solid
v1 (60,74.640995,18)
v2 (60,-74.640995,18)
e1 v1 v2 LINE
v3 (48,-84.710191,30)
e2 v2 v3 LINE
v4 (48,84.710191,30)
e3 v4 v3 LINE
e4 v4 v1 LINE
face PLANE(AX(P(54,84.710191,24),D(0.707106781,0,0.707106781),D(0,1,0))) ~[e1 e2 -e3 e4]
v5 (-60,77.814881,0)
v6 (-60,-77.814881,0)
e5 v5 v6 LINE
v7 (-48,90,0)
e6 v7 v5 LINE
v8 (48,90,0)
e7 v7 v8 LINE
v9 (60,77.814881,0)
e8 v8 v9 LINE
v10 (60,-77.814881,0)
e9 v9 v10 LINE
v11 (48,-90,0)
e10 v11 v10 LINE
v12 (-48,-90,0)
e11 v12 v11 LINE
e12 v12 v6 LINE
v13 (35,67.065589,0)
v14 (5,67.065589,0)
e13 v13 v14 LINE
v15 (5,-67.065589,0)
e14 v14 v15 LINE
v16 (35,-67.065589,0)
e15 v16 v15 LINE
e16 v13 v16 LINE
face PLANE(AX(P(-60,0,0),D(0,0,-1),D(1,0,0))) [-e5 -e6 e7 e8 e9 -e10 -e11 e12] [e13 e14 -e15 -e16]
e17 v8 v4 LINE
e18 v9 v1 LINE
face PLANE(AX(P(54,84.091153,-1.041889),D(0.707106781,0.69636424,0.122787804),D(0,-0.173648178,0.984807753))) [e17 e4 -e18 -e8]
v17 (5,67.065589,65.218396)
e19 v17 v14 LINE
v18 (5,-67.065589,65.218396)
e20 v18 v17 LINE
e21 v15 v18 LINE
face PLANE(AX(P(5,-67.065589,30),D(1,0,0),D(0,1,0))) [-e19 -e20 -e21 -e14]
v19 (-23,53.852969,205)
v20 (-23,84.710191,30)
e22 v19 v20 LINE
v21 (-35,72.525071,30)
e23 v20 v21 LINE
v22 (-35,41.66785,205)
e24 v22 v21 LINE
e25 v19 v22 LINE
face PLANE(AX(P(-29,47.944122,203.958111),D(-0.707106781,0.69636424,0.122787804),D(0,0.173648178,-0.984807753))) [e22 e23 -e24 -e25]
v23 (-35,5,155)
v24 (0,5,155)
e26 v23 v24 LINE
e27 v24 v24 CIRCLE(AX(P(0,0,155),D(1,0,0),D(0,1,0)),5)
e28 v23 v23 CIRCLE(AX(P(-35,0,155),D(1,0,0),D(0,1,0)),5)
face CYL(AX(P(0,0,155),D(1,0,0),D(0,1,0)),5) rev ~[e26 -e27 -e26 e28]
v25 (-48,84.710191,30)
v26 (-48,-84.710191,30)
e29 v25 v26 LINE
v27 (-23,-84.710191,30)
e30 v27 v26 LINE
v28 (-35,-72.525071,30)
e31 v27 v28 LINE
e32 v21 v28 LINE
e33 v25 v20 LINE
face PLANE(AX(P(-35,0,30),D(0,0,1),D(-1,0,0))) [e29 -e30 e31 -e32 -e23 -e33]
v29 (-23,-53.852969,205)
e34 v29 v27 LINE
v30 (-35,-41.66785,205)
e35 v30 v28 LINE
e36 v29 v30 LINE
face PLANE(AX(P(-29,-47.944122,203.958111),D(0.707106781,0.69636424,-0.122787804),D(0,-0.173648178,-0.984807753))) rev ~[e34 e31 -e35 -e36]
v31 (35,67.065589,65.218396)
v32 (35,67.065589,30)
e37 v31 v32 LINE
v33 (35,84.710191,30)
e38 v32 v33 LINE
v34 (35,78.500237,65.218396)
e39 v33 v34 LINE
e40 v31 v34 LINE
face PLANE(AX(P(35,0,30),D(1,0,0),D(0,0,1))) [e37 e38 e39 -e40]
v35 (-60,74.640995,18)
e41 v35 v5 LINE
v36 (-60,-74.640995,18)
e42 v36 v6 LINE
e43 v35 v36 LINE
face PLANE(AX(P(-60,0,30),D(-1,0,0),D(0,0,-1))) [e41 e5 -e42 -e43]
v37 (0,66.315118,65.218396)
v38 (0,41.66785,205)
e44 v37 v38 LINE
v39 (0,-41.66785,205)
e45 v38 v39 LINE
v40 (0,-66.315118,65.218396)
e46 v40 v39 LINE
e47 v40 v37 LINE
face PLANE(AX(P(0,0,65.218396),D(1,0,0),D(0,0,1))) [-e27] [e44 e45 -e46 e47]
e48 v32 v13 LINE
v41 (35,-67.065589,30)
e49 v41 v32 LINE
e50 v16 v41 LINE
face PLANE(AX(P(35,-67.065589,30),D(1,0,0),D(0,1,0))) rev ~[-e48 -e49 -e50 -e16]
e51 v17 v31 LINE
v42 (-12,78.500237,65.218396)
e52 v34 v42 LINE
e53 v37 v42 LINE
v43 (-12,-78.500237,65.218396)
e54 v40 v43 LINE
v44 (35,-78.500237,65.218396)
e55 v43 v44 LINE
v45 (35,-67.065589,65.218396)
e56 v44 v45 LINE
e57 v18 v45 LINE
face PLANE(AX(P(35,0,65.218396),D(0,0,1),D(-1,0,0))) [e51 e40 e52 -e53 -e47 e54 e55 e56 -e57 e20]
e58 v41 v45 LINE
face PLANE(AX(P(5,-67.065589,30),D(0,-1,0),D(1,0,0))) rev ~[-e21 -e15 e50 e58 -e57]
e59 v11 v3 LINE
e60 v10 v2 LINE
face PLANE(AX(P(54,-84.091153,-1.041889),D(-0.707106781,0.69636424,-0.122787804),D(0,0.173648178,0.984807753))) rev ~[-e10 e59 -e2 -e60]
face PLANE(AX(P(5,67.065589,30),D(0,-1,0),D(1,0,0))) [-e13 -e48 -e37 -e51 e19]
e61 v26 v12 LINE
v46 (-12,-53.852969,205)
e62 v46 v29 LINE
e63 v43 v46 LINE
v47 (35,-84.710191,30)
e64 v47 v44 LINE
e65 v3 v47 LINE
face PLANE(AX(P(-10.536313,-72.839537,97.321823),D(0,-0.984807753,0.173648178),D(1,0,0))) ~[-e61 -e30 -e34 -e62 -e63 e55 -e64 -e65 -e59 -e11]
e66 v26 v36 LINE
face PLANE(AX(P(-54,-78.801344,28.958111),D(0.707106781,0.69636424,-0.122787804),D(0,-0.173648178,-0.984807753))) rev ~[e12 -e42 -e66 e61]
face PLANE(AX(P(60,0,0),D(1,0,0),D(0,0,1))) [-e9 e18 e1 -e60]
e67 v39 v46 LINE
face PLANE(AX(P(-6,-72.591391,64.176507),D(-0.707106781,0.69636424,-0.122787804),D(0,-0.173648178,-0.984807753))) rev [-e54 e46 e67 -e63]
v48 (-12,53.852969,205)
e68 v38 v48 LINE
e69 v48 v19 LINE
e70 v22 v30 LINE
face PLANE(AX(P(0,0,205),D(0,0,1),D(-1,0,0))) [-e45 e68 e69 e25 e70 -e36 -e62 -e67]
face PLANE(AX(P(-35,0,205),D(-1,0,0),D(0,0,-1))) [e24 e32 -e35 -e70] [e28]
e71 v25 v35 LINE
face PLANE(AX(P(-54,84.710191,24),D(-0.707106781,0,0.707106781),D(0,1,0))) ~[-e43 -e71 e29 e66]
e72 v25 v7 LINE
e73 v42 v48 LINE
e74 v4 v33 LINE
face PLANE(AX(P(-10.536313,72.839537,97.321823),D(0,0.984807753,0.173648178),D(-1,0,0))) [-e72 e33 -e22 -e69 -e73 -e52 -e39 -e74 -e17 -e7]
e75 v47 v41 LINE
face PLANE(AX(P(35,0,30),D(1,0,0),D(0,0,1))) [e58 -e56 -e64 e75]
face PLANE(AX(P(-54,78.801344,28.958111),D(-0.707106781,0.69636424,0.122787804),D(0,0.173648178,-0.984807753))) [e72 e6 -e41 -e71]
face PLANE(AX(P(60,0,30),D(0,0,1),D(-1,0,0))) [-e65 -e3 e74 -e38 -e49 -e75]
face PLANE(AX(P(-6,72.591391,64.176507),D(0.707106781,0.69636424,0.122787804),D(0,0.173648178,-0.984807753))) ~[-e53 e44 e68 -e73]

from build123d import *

# Parameters (mm, degrees)
F1_DEPTH = 90
F2_R     = 5
F3_DEPTH = 50
F4_W     = 30
F4_H     = 134.1311782598
F5_DEPTH = 40
F7_W     = 309.0550526977
F7_H     = 293.745405972
F8_DEPTH = 60
F9_SIZE  = 12


# Not quite as in the source:
# - a pattern or mirror of a feature is missing from the dataset's text; its kind, count and spacing are read off the source's solid


with BuildPart() as f1:
    # F0 (on Front) → F1 (new body, symmetric)
    with BuildSketch(Plane.XZ):
        Polygon((0, 65.2183964849), (0, 205), (-35, 205), (-35, 30), (-60, 30), (-60, 0), (0, 0), (60, 0), (60, 30), (35, 30), (35, 65.2183964849), align=None)
    extrude(amount=F1_DEPTH, both=True)

    # F2 (on Right) → F3 (cut, symmetric)
    with BuildSketch(Plane.YZ):
        with Locations((0, 155)):
            Circle(F2_R)
    extrude(amount=F3_DEPTH, both=True, mode=Mode.SUBTRACT)

    # F4 (on face) → F5 (cut, symmetric)
    with BuildSketch(Plane.XY.offset(30)):
        with Locations((20, 0)):
            Rectangle(F4_W, F4_H)
    extrude(amount=F5_DEPTH, both=True, mode=Mode.SUBTRACT)

    # F7 (on face) → F8 (cut)
    with BuildSketch(Plane(origin=(0, 87.2861679354, 15.3909064497), x_dir=(-1, 0, 0), z_dir=(0, 0.984807753, 0.1736481777))):
        with Locations((10.5363130569, 83.1948332489)):
            Rectangle(F7_W, F7_H)
    f8 = extrude(amount=F8_DEPTH, mode=Mode.SUBTRACT)

    # F8_copies: F8 across plane
    add(f8.mirror(Plane(origin=(0, 0, 0), x_dir=(0, 0, -1), z_dir=(0, -1, 0))), mode=Mode.SUBTRACT)

    # F9
    f9_edges = [f1.edges().sort_by_distance(p)[0] for p in [
        (0, 66.176603, 135.109198),
        (-35, 69.28158, 117.5),
        (-60, 87.355095, 15),
        (60, 87.355095, 15),
        (-60, 0, 30),
        (60, 0, 30),
        (0, -66.176603, 135.109198),
        (60, -87.355095, 15),
        (-35, -69.28158, 117.5),
        (-60, -87.355095, 15),
    ]]
    chamfer(f9_edges, length=F9_SIZE)


solid = f1.part
